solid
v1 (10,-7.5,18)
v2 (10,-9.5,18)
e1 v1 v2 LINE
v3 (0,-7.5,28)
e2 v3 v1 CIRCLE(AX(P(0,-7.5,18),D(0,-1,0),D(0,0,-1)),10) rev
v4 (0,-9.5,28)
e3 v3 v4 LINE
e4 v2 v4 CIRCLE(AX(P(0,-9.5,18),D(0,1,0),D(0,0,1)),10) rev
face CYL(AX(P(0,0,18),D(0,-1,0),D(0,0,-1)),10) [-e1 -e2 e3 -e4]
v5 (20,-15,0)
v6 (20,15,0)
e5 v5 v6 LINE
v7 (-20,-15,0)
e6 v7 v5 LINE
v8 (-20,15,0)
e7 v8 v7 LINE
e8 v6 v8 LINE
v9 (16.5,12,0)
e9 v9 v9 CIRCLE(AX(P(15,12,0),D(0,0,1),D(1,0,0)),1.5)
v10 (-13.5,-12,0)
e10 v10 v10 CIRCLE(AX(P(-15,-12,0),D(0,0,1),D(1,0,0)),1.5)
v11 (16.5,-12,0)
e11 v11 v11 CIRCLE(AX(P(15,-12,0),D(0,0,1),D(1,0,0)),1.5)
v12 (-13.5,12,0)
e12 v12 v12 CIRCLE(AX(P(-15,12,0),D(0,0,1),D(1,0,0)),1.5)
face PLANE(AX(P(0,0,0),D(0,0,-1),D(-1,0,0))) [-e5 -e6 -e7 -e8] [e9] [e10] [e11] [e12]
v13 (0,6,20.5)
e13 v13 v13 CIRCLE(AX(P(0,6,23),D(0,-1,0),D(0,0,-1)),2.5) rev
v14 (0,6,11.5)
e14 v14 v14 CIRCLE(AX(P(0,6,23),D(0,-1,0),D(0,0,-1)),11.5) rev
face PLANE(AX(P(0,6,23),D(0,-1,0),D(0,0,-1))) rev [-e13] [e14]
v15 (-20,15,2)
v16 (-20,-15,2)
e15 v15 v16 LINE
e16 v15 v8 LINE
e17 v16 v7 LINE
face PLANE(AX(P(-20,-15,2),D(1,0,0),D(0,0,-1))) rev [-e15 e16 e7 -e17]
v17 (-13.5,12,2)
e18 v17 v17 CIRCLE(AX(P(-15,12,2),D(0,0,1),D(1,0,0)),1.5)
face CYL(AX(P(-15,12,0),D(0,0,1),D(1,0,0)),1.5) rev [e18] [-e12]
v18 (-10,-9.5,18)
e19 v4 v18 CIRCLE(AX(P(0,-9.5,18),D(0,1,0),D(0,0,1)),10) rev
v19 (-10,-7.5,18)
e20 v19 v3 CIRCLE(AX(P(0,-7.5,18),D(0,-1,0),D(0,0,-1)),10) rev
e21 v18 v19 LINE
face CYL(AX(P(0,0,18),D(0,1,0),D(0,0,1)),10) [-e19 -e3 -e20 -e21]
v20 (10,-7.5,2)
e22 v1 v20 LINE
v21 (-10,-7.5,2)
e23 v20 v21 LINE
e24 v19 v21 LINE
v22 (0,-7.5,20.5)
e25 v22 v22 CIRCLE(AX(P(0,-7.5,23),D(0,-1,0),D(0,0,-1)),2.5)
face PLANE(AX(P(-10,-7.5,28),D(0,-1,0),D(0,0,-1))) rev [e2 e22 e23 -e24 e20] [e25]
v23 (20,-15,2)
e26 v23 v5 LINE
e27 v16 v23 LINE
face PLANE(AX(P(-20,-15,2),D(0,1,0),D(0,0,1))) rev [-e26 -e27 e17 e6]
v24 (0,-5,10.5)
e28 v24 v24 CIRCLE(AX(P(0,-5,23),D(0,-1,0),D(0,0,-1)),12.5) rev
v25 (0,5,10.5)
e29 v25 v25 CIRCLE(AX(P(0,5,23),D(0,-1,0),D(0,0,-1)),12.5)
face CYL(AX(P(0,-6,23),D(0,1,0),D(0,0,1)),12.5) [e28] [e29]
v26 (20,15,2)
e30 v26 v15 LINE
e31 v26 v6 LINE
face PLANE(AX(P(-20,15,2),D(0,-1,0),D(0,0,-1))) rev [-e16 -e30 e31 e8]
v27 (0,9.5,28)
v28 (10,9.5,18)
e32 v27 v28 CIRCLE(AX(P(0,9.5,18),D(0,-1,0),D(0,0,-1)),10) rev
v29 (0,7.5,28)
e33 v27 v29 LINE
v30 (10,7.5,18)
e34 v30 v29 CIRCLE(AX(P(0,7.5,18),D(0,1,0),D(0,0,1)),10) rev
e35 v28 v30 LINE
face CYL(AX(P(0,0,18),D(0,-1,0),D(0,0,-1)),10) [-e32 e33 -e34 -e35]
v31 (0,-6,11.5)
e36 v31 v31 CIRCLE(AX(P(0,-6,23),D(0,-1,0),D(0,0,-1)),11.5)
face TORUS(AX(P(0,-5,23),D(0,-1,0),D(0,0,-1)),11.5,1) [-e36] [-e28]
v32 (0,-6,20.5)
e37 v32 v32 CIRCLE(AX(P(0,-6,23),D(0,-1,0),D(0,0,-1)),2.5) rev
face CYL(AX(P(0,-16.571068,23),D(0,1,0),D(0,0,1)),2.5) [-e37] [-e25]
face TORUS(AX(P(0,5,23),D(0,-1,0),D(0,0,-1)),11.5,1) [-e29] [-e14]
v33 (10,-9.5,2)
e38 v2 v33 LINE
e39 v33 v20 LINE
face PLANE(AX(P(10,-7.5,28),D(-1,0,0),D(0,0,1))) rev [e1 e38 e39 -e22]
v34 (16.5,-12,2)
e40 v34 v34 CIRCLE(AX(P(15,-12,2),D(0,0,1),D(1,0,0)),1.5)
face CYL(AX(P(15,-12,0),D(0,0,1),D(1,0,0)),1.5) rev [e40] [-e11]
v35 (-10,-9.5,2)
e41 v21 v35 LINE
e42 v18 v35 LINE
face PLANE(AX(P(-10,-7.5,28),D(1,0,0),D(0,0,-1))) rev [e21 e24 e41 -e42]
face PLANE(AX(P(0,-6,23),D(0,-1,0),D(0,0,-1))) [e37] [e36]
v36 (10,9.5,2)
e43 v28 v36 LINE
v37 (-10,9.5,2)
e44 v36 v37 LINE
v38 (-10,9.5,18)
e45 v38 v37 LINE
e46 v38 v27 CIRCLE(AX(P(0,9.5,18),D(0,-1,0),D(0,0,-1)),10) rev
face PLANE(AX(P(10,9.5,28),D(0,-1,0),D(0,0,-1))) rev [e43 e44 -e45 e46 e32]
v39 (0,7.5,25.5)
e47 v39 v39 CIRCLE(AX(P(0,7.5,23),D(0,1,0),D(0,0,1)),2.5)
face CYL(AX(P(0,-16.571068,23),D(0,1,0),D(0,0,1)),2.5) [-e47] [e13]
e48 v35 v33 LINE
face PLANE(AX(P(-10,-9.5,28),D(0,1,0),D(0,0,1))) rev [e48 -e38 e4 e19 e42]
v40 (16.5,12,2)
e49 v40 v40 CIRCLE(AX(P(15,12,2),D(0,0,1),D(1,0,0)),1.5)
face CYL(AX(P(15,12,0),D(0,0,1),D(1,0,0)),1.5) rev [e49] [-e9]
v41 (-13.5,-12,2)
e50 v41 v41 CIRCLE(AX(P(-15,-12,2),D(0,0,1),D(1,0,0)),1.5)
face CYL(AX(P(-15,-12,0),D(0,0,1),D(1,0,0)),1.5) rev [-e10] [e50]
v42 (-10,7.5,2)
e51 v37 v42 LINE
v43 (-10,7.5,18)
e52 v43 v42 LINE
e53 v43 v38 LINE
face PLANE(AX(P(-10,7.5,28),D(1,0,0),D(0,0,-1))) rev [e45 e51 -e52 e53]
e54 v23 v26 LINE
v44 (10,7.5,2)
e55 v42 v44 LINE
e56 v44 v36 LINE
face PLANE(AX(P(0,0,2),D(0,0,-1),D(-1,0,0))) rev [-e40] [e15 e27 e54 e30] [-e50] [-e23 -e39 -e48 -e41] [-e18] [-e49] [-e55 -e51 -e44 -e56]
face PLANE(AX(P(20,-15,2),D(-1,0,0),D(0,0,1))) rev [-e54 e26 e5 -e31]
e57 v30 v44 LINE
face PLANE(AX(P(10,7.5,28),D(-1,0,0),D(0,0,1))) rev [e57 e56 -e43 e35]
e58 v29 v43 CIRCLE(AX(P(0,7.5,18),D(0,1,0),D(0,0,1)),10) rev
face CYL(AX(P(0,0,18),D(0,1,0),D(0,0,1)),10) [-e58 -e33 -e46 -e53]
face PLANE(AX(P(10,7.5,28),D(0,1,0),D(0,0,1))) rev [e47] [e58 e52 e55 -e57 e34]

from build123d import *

# Parameters (mm, degrees)
SKETCH1_W                = 40
SKETCH1_H                = 30
BOSS_EXTRUDE1_DEPTH      = 2
SKETCH2_R                = 1.5
CUT_EXTRUDE1_DEPTH       = 26.079872408
SKETCH3_W                = 20
SKETCH3_H                = 2
BOSS_EXTRUDE2_DEPTH      = 26
SKETCH4_R                = 2.5
BOSS_EXTRUDE3_DEPTH      = 19
BOSS_EXTRUDE4_DEPTH      = 6
BOSS_EXTRUDE4_DEPTH_BACK = 6
SKETCH5_R                = 12.5
FILLET1_R                = 10
FILLET2_R                = 1


with BuildPart() as part:
    # Sketch1 → Boss-Extrude1 (new body)
    with BuildSketch(Plane.XY):
        Rectangle(SKETCH1_W, SKETCH1_H)
    extrude(amount=BOSS_EXTRUDE1_DEPTH)

    # Sketch2 → Cut-Extrude1 (cut, through all)
    with BuildSketch(Plane.XY.offset(2)):
        with Locations((-15, 12)):
            Circle(SKETCH2_R)
        with Locations((15, 12)):
            Circle(SKETCH2_R)
        with Locations((15, -12)):
            Circle(SKETCH2_R)
        with Locations((-15, -12)):
            Circle(SKETCH2_R)
    extrude(amount=-CUT_EXTRUDE1_DEPTH, mode=Mode.SUBTRACT)

    # Sketch3 → Boss-Extrude2 (add)
    with BuildSketch(Plane.XY.offset(2)):
        with Locations((0, -8.5)):
            Rectangle(SKETCH3_W, SKETCH3_H)
        with Locations((0, 8.5)):
            Rectangle(SKETCH3_W, SKETCH3_H)
    extrude(amount=BOSS_EXTRUDE2_DEPTH)

    # Sketch4 → Boss-Extrude3 (add)
    with BuildSketch(Plane(origin=(0, 9.5, 0), x_dir=(1, 0, 0), z_dir=(0, 1, 0))):
        with Locations(Location((0, -23, 0), (0, 0, 270))):
            Circle(SKETCH4_R)
    extrude(amount=-BOSS_EXTRUDE3_DEPTH)

    # Sketch5 → Boss-Extrude4 (add, two sides: drawn at the far end of the back side and taken through both)
    with BuildSketch(Plane(origin=(0, 0, 0), x_dir=(-1, 0, 0), z_dir=(0, -1, 0)).offset(-BOSS_EXTRUDE4_DEPTH_BACK)):
        with Locations(Location((0, -23, 0), (0, 0, 90))):
            Circle(SKETCH5_R)
    extrude(amount=BOSS_EXTRUDE4_DEPTH + BOSS_EXTRUDE4_DEPTH_BACK)

    # Fillet1
    fillet1_edges = [part.edges().sort_by_distance(p)[0] for p in [
        (10, -8.5, 28),
        (-10, -8.5, 28),
        (10, 8.5, 28),
        (-10, 8.5, 28),
    ]]
    fillet(fillet1_edges, radius=FILLET1_R - 0.0001)  # a hair under: the kernel refuses the full size

    # Fillet2
    fillet2_edges = [part.edges().sort_by_distance(p)[0] for p in [
        (0, 6, 35.5),
        (0, -6, 35.5),
    ]]
    fillet(fillet2_edges, radius=FILLET2_R)


solid = part.part
